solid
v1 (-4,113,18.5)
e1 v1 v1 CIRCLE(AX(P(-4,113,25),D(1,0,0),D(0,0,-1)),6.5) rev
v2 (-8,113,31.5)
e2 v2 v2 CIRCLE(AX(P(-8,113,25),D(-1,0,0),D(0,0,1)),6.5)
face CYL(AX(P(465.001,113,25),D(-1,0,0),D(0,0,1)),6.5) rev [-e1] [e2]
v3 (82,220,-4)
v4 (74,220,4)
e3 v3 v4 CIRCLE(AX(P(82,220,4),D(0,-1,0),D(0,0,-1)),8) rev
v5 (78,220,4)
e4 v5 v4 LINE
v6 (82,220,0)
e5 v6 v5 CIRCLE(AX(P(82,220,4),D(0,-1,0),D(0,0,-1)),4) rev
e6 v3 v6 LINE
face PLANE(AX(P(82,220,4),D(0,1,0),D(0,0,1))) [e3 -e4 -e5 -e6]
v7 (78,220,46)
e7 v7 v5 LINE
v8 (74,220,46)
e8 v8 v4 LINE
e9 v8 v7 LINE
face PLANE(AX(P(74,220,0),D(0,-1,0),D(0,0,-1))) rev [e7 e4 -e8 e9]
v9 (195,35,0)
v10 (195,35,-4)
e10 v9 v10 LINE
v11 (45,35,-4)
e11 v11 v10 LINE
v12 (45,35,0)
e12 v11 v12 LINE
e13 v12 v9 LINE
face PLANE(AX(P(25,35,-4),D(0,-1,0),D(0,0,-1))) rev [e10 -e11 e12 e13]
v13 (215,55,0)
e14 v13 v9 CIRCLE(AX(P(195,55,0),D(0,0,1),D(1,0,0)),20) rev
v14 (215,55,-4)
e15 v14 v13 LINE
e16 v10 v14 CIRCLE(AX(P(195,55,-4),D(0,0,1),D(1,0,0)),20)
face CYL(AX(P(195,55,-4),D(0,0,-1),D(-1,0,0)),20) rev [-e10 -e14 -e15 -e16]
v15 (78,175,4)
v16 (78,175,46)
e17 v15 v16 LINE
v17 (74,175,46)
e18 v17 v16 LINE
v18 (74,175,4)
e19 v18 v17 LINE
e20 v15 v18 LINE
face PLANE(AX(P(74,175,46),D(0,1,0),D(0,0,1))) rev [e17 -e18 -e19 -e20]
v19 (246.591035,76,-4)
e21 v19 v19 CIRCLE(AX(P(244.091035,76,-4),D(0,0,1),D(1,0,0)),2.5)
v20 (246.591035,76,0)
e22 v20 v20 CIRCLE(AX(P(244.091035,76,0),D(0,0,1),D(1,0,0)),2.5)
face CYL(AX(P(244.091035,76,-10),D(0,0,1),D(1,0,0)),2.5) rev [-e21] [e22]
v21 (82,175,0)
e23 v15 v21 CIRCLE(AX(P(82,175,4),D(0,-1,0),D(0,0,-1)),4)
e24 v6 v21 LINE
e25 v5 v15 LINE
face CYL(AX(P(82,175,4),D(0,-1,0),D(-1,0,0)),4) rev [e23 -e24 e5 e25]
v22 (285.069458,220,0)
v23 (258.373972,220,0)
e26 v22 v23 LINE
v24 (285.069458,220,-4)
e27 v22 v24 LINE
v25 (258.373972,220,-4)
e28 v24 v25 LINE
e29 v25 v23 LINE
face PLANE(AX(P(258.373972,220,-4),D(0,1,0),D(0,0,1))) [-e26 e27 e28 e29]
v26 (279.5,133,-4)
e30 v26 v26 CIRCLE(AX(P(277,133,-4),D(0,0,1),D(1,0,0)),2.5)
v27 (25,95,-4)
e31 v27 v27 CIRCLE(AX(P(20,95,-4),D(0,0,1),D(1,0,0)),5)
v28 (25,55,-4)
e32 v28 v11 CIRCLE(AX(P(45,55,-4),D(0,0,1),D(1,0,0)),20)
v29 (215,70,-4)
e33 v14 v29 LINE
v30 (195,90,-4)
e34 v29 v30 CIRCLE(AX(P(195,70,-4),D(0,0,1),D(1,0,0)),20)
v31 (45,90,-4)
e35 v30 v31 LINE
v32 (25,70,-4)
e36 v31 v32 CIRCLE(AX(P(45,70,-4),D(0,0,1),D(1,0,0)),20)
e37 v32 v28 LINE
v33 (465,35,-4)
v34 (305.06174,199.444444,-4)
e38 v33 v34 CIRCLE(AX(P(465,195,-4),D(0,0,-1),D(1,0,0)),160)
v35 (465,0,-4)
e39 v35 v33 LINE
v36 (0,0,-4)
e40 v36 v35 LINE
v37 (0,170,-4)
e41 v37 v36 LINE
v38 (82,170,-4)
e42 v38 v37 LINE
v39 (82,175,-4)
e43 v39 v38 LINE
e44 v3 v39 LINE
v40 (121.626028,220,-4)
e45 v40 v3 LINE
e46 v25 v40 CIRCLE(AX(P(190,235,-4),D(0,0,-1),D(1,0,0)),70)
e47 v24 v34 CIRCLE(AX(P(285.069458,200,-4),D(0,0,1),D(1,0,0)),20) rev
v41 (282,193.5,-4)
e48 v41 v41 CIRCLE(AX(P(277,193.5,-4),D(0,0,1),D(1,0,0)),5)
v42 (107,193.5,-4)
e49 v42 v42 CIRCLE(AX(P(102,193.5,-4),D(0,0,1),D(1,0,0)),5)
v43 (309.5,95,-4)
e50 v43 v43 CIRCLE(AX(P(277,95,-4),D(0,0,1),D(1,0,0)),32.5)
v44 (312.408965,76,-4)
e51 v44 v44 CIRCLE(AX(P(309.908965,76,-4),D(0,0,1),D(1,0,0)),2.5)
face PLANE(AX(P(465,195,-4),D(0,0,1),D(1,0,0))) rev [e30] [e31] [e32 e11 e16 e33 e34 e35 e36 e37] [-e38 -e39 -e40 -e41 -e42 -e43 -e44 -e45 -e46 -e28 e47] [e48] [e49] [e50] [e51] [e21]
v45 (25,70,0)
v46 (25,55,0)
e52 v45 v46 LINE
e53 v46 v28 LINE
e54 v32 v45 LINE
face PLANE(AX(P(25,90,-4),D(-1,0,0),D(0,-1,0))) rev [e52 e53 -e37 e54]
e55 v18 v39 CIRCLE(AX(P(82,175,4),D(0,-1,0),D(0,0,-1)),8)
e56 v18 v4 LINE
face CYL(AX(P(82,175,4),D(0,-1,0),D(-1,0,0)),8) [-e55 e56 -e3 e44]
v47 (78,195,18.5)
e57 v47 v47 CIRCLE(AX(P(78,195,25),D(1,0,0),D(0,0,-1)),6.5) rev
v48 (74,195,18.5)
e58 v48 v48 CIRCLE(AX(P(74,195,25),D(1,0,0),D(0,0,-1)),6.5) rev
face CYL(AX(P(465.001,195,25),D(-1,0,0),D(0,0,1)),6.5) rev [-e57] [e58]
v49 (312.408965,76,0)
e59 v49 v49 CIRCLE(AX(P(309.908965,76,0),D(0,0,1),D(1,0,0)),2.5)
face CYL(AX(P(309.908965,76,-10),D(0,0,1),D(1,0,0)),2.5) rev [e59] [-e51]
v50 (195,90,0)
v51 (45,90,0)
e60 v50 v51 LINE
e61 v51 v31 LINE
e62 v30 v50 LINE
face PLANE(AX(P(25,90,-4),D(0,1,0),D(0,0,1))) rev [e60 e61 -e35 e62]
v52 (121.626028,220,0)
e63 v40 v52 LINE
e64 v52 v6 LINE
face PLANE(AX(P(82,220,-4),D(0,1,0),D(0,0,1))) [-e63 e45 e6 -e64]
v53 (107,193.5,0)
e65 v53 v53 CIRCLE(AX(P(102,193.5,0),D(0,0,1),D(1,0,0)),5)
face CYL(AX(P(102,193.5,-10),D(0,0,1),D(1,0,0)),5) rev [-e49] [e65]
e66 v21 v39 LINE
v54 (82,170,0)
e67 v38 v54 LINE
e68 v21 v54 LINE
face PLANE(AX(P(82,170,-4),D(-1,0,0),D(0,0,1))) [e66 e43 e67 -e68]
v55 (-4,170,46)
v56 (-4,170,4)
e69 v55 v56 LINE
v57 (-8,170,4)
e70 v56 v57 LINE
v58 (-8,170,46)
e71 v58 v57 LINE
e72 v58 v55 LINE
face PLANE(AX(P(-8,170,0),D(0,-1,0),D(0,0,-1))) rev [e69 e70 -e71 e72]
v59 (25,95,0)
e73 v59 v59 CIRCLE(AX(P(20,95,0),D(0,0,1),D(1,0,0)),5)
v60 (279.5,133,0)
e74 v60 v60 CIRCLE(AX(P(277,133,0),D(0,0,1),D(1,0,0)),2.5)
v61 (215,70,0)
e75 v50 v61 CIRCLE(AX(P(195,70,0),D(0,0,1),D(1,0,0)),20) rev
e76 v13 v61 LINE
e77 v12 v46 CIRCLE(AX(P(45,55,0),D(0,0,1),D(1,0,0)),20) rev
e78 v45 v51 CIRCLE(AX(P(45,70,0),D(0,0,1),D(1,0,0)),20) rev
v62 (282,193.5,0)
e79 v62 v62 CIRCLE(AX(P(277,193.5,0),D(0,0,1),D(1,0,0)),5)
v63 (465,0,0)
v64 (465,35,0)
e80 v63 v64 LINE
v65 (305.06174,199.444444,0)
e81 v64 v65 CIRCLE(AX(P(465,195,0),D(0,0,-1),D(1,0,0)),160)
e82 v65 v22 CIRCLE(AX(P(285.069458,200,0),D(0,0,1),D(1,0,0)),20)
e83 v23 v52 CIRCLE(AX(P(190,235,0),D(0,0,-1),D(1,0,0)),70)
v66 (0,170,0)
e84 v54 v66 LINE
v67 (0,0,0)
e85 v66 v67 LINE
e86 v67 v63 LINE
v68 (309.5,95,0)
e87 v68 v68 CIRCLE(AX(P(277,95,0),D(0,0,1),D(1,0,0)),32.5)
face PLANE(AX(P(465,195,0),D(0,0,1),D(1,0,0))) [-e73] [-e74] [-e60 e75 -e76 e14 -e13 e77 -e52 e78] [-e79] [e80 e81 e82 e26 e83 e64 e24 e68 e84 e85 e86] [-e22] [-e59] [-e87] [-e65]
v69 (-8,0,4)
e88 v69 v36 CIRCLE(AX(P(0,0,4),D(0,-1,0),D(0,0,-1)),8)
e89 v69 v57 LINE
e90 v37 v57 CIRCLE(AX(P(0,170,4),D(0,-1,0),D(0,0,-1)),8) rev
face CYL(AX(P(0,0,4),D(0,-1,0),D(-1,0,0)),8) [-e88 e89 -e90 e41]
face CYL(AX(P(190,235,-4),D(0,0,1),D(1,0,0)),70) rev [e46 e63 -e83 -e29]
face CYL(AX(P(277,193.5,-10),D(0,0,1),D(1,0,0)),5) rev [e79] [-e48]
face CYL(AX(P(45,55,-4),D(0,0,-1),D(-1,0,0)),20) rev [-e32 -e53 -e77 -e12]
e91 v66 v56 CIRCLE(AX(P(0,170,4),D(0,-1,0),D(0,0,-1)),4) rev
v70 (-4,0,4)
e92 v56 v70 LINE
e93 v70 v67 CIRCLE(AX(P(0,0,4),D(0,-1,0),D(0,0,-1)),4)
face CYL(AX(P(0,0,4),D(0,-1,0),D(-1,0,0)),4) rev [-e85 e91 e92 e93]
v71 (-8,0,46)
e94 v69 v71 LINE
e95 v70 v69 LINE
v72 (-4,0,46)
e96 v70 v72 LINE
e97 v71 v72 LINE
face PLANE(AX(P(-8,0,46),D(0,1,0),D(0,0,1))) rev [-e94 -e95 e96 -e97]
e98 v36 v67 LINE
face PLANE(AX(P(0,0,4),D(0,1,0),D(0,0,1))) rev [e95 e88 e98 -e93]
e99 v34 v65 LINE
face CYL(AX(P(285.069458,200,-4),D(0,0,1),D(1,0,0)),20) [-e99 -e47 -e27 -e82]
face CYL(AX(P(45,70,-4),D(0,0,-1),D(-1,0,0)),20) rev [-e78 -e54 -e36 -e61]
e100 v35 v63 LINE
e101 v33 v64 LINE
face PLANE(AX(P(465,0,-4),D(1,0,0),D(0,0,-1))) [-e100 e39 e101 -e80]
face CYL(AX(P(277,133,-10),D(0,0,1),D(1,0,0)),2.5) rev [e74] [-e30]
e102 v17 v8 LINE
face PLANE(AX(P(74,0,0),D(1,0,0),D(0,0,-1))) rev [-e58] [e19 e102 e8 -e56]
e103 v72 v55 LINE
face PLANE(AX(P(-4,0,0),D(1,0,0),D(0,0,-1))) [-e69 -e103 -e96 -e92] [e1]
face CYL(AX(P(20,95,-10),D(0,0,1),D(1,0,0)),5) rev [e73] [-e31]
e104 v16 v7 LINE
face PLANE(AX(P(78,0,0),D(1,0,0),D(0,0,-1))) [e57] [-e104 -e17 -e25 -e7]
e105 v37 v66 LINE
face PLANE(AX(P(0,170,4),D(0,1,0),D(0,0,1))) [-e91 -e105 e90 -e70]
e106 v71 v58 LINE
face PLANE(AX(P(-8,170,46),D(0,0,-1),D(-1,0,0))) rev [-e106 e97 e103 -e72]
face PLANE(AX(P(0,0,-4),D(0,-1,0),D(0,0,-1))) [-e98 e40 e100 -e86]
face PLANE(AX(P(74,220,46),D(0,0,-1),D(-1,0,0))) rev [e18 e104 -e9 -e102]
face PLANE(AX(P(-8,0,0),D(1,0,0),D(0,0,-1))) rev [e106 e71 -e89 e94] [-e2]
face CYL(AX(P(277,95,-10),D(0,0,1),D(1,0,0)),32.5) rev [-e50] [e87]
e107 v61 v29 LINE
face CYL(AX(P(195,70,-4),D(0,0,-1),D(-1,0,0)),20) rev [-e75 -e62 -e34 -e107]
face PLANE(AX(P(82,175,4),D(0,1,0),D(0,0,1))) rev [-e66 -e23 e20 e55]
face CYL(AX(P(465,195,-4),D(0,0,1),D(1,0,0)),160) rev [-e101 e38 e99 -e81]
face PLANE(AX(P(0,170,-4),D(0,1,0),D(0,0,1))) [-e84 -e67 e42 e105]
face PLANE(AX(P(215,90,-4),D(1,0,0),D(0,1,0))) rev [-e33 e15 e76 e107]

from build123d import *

# Parameters (mm, degrees)
SKETCH_1_W                  = 190
SKETCH_1_H                  = 55
SM_BASE_FLANGE_1_DEPTH      = 4
SKETCH_6_R                  = 32.5
SKETCH_6_R_2                = 2.5
CUT_EXTRUDE_1_DEPTH         = 10
SKETCH_7_R                  = 5
CUT_EXTRUDE_2_DEPTH         = 10
FILLET_1_R                  = 20
FILLET_2_R                  = 20
SM_EDGE_FLANGE_1_DEPTH      = 45
SM_EDGE_FLANGE_1_BEND_DEPTH = 170
CUT_EXTRUDE_4_REACH         = 525.684
SKETCH_15_R                 = 6.5


# Sheet-metal steps are written as plain solids
with BuildPart() as part:
    # Sketch 1 → 基体-法兰1 (new body)
    with BuildSketch(Plane.XY):
        with BuildLine():
            Line((0, 0), (0, 170))
            Line((0, 170), (82, 170))
            Line((82, 170), (82, 220))
            Line((82, 220), (121.626028344, 220))
            ThreePointArc((121.626028344, 220), (190, 165), (258.373971656, 220))
            Line((258.373971656, 220), (306.965193707, 220))
            ThreePointArc((306.965193707, 220), (343.344749394, 91.076951546), (465, 35))
            Line((465, 35), (465, 0))
            Line((465, 0), (0, 0))
        make_face()
        with Locations((120, 62.5)):
            Rectangle(SKETCH_1_W, SKETCH_1_H, mode=Mode.SUBTRACT)
    extrude(amount=-SM_BASE_FLANGE_1_DEPTH)

    # 草图6 → 切除-拉伸1 (cut)
    with BuildSketch(Plane.XY):
        with Locations((277, 95)):
            Circle(SKETCH_6_R)
        with Locations((277, 133)):
            Circle(SKETCH_6_R_2)
        with Locations((309.908965344, 76)):
            Circle(SKETCH_6_R_2)
        with Locations((244.091034656, 76)):
            Circle(SKETCH_6_R_2)
    extrude(amount=-CUT_EXTRUDE_1_DEPTH, mode=Mode.SUBTRACT)

    # 草图7 → 切除-拉伸2 (cut)
    with BuildSketch(Plane.XY):
        with Locations((20, 95)):
            Circle(SKETCH_7_R)
        with Locations((102, 193.5)):
            Circle(SKETCH_7_R)
        with Locations((277, 193.5)):
            Circle(SKETCH_7_R)
    extrude(amount=-CUT_EXTRUDE_2_DEPTH, mode=Mode.SUBTRACT)

    # 圆角1
    fillet_1_edges = [part.edges().sort_by_distance(p)[0] for p in [
        (25, 35, -2),
        (25, 90, -2),
        (215, 90, -2),
        (215, 35, -2),
    ]]
    fillet(fillet_1_edges, radius=FILLET_1_R)

    # 圆角2
    fillet_2_edges = [part.edges().sort_by_distance(p)[0] for p in [
        (306.965193707, 220, -2),
    ]]
    fillet(fillet_2_edges, radius=FILLET_2_R)

    # 边线-法兰1 section (across the edge) → 边线-法兰1 (add)
    with BuildSketch(Plane(origin=(78, 220, 0), x_dir=(1, 0, 0), z_dir=(0, -1, 0))):
        with BuildLine():
            Line((-4, 4), (-4, 46))
            Line((-4, 46), (0, 46))
            Line((0, 46), (0, 4))
            ThreePointArc((0, 4), (1.171572875, 1.171572875), (4, 0))
            Line((4, 0), (4, -4))
            ThreePointArc((4, -4), (-1.656854249, -1.656854249), (-4, 4))
        make_face()
    extrude(amount=SM_EDGE_FLANGE_1_DEPTH)

    # 边线-法兰1 section 2 (across the edge) → 边线-法兰1 bend (add)
    with BuildSketch(Plane(origin=(-4, 170, 0), x_dir=(1, 0, 0), z_dir=(0, -1, 0))):
        with BuildLine():
            Line((-4, 4), (-4, 46))
            Line((-4, 46), (0, 46))
            Line((0, 46), (0, 4))
            ThreePointArc((0, 4), (1.171572875, 1.171572875), (4, 0))
            Line((4, 0), (4, -4))
            ThreePointArc((4, -4), (-1.656854249, -1.656854249), (-4, 4))
        make_face()
    extrude(amount=SM_EDGE_FLANGE_1_BEND_DEPTH)

    # 草图15 → 切除-拉伸4 (cut, up to next)
    with BuildSketch(Plane.ZY.offset(8), mode=Mode.PRIVATE) as cut_extrude_4_sk1:
        with Locations((25, 113)):
            Circle(SKETCH_15_R)
    cut_extrude_4_tool1 = extrude(cut_extrude_4_sk1.sketch, amount=-CUT_EXTRUDE_4_REACH, mode=Mode.PRIVATE) & part.part
    # 草图15 → 切除-拉伸4 (cut, up to next)
    with BuildSketch(Plane.ZY.offset(8), mode=Mode.PRIVATE) as cut_extrude_4_sk2:
        with Locations(Location((25, 195, 0), (0, 0, 180))):
            Circle(SKETCH_15_R)
    cut_extrude_4_tool2 = extrude(cut_extrude_4_sk2.sketch, amount=-CUT_EXTRUDE_4_REACH, mode=Mode.PRIVATE) & part.part
    add(cut_extrude_4_tool1.solids().sort_by_distance((-8, 113, 25))[0], mode=Mode.SUBTRACT)
    add(cut_extrude_4_tool2.solids().sort_by_distance((-8, 195, 25))[0], mode=Mode.SUBTRACT)


solid = part.part
